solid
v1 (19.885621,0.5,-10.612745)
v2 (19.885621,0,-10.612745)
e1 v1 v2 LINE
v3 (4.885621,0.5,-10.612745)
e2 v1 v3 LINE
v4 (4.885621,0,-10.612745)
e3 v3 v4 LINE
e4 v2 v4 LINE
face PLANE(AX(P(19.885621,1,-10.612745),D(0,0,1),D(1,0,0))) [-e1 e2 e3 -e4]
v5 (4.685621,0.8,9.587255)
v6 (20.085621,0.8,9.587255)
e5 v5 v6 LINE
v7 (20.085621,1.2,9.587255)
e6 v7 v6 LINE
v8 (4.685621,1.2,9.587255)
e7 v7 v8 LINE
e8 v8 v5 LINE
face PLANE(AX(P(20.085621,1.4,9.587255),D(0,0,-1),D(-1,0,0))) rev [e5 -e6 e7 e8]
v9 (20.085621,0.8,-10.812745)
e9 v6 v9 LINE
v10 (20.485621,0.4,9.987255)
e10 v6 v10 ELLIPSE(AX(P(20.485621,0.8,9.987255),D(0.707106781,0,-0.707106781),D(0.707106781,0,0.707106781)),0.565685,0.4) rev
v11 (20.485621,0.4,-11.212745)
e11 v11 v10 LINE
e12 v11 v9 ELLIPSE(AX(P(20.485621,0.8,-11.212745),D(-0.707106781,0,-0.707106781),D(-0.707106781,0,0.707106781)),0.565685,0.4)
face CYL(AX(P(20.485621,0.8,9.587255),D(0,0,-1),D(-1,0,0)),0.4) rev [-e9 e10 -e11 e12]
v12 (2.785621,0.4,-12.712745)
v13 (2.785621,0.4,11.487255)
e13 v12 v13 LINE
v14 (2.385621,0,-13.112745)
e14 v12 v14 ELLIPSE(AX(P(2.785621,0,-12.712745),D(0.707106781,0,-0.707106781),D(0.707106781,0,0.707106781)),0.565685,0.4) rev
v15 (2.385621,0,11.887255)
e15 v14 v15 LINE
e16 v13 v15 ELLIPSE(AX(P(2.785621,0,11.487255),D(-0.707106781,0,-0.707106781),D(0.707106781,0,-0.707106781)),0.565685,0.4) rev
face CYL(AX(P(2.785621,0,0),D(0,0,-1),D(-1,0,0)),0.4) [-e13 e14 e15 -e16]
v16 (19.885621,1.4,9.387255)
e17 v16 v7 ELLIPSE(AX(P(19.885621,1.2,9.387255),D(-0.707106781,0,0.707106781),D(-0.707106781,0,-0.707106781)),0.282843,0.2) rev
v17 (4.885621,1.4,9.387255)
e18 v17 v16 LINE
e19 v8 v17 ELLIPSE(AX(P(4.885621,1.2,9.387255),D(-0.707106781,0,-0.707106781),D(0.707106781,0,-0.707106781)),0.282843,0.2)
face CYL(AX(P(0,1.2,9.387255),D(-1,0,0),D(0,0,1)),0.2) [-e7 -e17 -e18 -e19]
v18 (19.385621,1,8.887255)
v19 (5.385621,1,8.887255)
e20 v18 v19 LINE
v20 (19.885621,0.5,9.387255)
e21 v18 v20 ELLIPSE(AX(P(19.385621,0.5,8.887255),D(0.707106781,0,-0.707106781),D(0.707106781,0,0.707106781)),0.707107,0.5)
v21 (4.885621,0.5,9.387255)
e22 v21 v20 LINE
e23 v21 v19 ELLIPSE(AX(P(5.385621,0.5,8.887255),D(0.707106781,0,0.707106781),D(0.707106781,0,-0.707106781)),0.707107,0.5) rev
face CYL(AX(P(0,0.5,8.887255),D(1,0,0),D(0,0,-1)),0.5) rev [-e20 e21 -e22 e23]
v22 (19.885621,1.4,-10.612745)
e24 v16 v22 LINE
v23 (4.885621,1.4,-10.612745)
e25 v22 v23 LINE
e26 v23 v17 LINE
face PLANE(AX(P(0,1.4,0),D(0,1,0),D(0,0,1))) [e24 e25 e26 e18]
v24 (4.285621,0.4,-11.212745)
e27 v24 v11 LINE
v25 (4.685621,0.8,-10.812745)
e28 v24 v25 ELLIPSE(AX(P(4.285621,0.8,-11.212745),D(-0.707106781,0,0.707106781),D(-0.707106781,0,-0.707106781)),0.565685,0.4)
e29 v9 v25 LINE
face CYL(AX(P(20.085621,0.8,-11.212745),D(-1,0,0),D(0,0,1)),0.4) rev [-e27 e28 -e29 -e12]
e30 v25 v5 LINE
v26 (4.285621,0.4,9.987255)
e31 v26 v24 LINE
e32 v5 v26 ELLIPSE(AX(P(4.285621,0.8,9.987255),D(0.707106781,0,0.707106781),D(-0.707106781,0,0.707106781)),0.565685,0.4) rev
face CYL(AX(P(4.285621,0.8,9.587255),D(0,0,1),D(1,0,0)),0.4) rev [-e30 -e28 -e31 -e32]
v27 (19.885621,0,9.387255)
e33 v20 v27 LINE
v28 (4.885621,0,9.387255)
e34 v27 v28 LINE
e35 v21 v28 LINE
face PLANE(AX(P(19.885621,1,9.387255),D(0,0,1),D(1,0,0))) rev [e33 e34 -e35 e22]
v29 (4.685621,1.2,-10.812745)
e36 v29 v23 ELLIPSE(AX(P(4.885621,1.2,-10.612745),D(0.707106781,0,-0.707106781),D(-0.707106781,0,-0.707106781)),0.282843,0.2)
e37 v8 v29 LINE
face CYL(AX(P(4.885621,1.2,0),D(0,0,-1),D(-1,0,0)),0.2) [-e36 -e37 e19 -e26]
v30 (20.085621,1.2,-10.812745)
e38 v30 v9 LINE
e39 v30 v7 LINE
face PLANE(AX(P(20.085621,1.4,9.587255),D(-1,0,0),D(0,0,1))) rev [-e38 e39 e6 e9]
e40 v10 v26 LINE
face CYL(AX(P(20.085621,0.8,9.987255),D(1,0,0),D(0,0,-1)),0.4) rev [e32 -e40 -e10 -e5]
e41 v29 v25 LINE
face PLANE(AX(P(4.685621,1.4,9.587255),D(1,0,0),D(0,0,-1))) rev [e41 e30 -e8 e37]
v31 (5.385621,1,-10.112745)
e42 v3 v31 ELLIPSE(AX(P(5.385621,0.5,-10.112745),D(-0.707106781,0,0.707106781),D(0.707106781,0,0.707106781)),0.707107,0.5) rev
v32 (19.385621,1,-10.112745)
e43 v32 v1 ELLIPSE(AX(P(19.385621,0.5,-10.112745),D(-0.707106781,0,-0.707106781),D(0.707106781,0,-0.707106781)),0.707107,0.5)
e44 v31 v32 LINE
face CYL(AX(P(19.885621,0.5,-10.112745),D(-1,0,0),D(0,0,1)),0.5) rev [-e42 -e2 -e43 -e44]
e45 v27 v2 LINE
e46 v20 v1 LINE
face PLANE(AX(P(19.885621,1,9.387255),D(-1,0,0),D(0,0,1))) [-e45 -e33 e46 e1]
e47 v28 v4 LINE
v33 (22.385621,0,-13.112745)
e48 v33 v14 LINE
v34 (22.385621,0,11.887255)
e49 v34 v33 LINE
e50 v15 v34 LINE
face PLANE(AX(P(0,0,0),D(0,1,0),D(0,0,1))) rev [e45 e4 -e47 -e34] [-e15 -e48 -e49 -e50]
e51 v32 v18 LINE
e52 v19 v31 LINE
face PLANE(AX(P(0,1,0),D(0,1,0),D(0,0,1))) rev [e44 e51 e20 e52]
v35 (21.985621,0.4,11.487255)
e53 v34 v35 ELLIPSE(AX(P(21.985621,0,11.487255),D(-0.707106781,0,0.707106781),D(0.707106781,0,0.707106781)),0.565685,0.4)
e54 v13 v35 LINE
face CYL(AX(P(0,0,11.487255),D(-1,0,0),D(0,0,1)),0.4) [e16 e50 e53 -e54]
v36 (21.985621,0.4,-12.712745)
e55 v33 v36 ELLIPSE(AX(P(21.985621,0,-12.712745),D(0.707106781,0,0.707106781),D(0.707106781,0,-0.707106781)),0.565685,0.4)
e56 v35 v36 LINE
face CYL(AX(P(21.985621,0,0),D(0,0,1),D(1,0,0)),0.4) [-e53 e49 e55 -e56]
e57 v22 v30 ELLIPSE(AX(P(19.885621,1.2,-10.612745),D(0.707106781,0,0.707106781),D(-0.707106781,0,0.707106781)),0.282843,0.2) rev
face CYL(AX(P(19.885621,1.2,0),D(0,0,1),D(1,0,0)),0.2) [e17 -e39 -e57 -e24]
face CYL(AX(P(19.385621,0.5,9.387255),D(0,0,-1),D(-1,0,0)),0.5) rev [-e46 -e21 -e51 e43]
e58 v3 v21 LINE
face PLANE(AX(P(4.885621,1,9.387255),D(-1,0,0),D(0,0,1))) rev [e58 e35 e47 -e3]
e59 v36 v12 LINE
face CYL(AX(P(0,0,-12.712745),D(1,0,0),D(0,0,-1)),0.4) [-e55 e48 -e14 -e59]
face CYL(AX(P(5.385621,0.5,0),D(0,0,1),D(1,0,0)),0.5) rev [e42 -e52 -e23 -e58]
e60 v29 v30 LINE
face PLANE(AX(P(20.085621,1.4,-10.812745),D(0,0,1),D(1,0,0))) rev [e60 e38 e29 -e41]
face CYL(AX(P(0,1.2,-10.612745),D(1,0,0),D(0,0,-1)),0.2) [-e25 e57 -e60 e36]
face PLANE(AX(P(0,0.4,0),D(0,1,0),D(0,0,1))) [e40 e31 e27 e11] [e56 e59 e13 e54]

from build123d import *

# Parameters (mm, degrees)
SKETCH1_W           = 20
SKETCH1_H           = 25
BOSS_EXTRUDE1_DEPTH = 0.4
SKETCH4_W           = 15.4
SKETCH4_H           = 20.4
BOSS_EXTRUDE3_DEPTH = 1
SKETCH5_W           = 15
SKETCH5_H           = 20
CUT_EXTRUDE1_DEPTH  = 1
FILLET3_R           = 0.4
FILLET4_R           = 0.2
FILLET5_R           = 0.5
FILLET6_R           = 0.4


with BuildPart() as part:
    # Sketch1 → Boss-Extrude1 (new body)
    with BuildSketch(Plane(origin=(0, 0, 0), x_dir=(1, 0, 0), z_dir=(0, 1, 0))):
        with Locations((12.385620915, 0.612745098)):
            Rectangle(SKETCH1_W, SKETCH1_H)
    extrude(amount=BOSS_EXTRUDE1_DEPTH)

    # Sketch4 → Boss-Extrude3 (add)
    with BuildSketch(Plane(origin=(0, 0.4, 0), x_dir=(1, 0, 0), z_dir=(0, 1, 0))):
        with Locations((12.385620915, 0.612745098)):
            Rectangle(SKETCH4_W, SKETCH4_H)
    extrude(amount=BOSS_EXTRUDE3_DEPTH)

    # Sketch5 → Cut-Extrude1 (cut)
    with BuildSketch(Plane.XZ):
        with Locations((12.385620915, -0.612745098)):
            Rectangle(SKETCH5_W, SKETCH5_H)
    extrude(amount=-CUT_EXTRUDE1_DEPTH, mode=Mode.SUBTRACT)

    # Fillet3
    fillet3_edges = [part.edges().sort_by_distance(p)[0] for p in [
        (4.685620915, 0.4, -0.612745098),
        (12.385620915, 0.4, 9.587254902),
        (20.085620915, 0.4, -0.612745098),
        (12.385620915, 0.4, -10.812745098),
    ]]
    fillet(fillet3_edges, radius=FILLET3_R)

    # Fillet4
    fillet4_edges = [part.edges().sort_by_distance(p)[0] for p in [
        (4.685620915, 1.4, -0.612745098),
        (12.385620915, 1.4, 9.587254902),
        (20.085620915, 1.4, -0.612745098),
        (12.385620915, 1.4, -10.812745098),
    ]]
    fillet(fillet4_edges, radius=FILLET4_R)

    # Fillet5
    fillet5_edges = [part.edges().sort_by_distance(p)[0] for p in [
        (4.885620915, 1, -0.612745098),
        (12.385620915, 1, 9.387254902),
        (19.885620915, 1, -0.612745098),
        (12.385620915, 1, -10.612745098),
    ]]
    fillet(fillet5_edges, radius=FILLET5_R)

    # Fillet6
    fillet6_edges = [part.edges().sort_by_distance(p)[0] for p in [
        (12.385620915, 0.4, 11.887254902),
        (2.385620915, 0.4, -0.612745098),
        (22.385620915, 0.4, -0.612745098),
        (12.385620915, 0.4, -13.112745098),
    ]]
    fillet(fillet6_edges, radius=FILLET6_R - 0.0001)  # a hair under: the kernel refuses the full size


solid = part.part
